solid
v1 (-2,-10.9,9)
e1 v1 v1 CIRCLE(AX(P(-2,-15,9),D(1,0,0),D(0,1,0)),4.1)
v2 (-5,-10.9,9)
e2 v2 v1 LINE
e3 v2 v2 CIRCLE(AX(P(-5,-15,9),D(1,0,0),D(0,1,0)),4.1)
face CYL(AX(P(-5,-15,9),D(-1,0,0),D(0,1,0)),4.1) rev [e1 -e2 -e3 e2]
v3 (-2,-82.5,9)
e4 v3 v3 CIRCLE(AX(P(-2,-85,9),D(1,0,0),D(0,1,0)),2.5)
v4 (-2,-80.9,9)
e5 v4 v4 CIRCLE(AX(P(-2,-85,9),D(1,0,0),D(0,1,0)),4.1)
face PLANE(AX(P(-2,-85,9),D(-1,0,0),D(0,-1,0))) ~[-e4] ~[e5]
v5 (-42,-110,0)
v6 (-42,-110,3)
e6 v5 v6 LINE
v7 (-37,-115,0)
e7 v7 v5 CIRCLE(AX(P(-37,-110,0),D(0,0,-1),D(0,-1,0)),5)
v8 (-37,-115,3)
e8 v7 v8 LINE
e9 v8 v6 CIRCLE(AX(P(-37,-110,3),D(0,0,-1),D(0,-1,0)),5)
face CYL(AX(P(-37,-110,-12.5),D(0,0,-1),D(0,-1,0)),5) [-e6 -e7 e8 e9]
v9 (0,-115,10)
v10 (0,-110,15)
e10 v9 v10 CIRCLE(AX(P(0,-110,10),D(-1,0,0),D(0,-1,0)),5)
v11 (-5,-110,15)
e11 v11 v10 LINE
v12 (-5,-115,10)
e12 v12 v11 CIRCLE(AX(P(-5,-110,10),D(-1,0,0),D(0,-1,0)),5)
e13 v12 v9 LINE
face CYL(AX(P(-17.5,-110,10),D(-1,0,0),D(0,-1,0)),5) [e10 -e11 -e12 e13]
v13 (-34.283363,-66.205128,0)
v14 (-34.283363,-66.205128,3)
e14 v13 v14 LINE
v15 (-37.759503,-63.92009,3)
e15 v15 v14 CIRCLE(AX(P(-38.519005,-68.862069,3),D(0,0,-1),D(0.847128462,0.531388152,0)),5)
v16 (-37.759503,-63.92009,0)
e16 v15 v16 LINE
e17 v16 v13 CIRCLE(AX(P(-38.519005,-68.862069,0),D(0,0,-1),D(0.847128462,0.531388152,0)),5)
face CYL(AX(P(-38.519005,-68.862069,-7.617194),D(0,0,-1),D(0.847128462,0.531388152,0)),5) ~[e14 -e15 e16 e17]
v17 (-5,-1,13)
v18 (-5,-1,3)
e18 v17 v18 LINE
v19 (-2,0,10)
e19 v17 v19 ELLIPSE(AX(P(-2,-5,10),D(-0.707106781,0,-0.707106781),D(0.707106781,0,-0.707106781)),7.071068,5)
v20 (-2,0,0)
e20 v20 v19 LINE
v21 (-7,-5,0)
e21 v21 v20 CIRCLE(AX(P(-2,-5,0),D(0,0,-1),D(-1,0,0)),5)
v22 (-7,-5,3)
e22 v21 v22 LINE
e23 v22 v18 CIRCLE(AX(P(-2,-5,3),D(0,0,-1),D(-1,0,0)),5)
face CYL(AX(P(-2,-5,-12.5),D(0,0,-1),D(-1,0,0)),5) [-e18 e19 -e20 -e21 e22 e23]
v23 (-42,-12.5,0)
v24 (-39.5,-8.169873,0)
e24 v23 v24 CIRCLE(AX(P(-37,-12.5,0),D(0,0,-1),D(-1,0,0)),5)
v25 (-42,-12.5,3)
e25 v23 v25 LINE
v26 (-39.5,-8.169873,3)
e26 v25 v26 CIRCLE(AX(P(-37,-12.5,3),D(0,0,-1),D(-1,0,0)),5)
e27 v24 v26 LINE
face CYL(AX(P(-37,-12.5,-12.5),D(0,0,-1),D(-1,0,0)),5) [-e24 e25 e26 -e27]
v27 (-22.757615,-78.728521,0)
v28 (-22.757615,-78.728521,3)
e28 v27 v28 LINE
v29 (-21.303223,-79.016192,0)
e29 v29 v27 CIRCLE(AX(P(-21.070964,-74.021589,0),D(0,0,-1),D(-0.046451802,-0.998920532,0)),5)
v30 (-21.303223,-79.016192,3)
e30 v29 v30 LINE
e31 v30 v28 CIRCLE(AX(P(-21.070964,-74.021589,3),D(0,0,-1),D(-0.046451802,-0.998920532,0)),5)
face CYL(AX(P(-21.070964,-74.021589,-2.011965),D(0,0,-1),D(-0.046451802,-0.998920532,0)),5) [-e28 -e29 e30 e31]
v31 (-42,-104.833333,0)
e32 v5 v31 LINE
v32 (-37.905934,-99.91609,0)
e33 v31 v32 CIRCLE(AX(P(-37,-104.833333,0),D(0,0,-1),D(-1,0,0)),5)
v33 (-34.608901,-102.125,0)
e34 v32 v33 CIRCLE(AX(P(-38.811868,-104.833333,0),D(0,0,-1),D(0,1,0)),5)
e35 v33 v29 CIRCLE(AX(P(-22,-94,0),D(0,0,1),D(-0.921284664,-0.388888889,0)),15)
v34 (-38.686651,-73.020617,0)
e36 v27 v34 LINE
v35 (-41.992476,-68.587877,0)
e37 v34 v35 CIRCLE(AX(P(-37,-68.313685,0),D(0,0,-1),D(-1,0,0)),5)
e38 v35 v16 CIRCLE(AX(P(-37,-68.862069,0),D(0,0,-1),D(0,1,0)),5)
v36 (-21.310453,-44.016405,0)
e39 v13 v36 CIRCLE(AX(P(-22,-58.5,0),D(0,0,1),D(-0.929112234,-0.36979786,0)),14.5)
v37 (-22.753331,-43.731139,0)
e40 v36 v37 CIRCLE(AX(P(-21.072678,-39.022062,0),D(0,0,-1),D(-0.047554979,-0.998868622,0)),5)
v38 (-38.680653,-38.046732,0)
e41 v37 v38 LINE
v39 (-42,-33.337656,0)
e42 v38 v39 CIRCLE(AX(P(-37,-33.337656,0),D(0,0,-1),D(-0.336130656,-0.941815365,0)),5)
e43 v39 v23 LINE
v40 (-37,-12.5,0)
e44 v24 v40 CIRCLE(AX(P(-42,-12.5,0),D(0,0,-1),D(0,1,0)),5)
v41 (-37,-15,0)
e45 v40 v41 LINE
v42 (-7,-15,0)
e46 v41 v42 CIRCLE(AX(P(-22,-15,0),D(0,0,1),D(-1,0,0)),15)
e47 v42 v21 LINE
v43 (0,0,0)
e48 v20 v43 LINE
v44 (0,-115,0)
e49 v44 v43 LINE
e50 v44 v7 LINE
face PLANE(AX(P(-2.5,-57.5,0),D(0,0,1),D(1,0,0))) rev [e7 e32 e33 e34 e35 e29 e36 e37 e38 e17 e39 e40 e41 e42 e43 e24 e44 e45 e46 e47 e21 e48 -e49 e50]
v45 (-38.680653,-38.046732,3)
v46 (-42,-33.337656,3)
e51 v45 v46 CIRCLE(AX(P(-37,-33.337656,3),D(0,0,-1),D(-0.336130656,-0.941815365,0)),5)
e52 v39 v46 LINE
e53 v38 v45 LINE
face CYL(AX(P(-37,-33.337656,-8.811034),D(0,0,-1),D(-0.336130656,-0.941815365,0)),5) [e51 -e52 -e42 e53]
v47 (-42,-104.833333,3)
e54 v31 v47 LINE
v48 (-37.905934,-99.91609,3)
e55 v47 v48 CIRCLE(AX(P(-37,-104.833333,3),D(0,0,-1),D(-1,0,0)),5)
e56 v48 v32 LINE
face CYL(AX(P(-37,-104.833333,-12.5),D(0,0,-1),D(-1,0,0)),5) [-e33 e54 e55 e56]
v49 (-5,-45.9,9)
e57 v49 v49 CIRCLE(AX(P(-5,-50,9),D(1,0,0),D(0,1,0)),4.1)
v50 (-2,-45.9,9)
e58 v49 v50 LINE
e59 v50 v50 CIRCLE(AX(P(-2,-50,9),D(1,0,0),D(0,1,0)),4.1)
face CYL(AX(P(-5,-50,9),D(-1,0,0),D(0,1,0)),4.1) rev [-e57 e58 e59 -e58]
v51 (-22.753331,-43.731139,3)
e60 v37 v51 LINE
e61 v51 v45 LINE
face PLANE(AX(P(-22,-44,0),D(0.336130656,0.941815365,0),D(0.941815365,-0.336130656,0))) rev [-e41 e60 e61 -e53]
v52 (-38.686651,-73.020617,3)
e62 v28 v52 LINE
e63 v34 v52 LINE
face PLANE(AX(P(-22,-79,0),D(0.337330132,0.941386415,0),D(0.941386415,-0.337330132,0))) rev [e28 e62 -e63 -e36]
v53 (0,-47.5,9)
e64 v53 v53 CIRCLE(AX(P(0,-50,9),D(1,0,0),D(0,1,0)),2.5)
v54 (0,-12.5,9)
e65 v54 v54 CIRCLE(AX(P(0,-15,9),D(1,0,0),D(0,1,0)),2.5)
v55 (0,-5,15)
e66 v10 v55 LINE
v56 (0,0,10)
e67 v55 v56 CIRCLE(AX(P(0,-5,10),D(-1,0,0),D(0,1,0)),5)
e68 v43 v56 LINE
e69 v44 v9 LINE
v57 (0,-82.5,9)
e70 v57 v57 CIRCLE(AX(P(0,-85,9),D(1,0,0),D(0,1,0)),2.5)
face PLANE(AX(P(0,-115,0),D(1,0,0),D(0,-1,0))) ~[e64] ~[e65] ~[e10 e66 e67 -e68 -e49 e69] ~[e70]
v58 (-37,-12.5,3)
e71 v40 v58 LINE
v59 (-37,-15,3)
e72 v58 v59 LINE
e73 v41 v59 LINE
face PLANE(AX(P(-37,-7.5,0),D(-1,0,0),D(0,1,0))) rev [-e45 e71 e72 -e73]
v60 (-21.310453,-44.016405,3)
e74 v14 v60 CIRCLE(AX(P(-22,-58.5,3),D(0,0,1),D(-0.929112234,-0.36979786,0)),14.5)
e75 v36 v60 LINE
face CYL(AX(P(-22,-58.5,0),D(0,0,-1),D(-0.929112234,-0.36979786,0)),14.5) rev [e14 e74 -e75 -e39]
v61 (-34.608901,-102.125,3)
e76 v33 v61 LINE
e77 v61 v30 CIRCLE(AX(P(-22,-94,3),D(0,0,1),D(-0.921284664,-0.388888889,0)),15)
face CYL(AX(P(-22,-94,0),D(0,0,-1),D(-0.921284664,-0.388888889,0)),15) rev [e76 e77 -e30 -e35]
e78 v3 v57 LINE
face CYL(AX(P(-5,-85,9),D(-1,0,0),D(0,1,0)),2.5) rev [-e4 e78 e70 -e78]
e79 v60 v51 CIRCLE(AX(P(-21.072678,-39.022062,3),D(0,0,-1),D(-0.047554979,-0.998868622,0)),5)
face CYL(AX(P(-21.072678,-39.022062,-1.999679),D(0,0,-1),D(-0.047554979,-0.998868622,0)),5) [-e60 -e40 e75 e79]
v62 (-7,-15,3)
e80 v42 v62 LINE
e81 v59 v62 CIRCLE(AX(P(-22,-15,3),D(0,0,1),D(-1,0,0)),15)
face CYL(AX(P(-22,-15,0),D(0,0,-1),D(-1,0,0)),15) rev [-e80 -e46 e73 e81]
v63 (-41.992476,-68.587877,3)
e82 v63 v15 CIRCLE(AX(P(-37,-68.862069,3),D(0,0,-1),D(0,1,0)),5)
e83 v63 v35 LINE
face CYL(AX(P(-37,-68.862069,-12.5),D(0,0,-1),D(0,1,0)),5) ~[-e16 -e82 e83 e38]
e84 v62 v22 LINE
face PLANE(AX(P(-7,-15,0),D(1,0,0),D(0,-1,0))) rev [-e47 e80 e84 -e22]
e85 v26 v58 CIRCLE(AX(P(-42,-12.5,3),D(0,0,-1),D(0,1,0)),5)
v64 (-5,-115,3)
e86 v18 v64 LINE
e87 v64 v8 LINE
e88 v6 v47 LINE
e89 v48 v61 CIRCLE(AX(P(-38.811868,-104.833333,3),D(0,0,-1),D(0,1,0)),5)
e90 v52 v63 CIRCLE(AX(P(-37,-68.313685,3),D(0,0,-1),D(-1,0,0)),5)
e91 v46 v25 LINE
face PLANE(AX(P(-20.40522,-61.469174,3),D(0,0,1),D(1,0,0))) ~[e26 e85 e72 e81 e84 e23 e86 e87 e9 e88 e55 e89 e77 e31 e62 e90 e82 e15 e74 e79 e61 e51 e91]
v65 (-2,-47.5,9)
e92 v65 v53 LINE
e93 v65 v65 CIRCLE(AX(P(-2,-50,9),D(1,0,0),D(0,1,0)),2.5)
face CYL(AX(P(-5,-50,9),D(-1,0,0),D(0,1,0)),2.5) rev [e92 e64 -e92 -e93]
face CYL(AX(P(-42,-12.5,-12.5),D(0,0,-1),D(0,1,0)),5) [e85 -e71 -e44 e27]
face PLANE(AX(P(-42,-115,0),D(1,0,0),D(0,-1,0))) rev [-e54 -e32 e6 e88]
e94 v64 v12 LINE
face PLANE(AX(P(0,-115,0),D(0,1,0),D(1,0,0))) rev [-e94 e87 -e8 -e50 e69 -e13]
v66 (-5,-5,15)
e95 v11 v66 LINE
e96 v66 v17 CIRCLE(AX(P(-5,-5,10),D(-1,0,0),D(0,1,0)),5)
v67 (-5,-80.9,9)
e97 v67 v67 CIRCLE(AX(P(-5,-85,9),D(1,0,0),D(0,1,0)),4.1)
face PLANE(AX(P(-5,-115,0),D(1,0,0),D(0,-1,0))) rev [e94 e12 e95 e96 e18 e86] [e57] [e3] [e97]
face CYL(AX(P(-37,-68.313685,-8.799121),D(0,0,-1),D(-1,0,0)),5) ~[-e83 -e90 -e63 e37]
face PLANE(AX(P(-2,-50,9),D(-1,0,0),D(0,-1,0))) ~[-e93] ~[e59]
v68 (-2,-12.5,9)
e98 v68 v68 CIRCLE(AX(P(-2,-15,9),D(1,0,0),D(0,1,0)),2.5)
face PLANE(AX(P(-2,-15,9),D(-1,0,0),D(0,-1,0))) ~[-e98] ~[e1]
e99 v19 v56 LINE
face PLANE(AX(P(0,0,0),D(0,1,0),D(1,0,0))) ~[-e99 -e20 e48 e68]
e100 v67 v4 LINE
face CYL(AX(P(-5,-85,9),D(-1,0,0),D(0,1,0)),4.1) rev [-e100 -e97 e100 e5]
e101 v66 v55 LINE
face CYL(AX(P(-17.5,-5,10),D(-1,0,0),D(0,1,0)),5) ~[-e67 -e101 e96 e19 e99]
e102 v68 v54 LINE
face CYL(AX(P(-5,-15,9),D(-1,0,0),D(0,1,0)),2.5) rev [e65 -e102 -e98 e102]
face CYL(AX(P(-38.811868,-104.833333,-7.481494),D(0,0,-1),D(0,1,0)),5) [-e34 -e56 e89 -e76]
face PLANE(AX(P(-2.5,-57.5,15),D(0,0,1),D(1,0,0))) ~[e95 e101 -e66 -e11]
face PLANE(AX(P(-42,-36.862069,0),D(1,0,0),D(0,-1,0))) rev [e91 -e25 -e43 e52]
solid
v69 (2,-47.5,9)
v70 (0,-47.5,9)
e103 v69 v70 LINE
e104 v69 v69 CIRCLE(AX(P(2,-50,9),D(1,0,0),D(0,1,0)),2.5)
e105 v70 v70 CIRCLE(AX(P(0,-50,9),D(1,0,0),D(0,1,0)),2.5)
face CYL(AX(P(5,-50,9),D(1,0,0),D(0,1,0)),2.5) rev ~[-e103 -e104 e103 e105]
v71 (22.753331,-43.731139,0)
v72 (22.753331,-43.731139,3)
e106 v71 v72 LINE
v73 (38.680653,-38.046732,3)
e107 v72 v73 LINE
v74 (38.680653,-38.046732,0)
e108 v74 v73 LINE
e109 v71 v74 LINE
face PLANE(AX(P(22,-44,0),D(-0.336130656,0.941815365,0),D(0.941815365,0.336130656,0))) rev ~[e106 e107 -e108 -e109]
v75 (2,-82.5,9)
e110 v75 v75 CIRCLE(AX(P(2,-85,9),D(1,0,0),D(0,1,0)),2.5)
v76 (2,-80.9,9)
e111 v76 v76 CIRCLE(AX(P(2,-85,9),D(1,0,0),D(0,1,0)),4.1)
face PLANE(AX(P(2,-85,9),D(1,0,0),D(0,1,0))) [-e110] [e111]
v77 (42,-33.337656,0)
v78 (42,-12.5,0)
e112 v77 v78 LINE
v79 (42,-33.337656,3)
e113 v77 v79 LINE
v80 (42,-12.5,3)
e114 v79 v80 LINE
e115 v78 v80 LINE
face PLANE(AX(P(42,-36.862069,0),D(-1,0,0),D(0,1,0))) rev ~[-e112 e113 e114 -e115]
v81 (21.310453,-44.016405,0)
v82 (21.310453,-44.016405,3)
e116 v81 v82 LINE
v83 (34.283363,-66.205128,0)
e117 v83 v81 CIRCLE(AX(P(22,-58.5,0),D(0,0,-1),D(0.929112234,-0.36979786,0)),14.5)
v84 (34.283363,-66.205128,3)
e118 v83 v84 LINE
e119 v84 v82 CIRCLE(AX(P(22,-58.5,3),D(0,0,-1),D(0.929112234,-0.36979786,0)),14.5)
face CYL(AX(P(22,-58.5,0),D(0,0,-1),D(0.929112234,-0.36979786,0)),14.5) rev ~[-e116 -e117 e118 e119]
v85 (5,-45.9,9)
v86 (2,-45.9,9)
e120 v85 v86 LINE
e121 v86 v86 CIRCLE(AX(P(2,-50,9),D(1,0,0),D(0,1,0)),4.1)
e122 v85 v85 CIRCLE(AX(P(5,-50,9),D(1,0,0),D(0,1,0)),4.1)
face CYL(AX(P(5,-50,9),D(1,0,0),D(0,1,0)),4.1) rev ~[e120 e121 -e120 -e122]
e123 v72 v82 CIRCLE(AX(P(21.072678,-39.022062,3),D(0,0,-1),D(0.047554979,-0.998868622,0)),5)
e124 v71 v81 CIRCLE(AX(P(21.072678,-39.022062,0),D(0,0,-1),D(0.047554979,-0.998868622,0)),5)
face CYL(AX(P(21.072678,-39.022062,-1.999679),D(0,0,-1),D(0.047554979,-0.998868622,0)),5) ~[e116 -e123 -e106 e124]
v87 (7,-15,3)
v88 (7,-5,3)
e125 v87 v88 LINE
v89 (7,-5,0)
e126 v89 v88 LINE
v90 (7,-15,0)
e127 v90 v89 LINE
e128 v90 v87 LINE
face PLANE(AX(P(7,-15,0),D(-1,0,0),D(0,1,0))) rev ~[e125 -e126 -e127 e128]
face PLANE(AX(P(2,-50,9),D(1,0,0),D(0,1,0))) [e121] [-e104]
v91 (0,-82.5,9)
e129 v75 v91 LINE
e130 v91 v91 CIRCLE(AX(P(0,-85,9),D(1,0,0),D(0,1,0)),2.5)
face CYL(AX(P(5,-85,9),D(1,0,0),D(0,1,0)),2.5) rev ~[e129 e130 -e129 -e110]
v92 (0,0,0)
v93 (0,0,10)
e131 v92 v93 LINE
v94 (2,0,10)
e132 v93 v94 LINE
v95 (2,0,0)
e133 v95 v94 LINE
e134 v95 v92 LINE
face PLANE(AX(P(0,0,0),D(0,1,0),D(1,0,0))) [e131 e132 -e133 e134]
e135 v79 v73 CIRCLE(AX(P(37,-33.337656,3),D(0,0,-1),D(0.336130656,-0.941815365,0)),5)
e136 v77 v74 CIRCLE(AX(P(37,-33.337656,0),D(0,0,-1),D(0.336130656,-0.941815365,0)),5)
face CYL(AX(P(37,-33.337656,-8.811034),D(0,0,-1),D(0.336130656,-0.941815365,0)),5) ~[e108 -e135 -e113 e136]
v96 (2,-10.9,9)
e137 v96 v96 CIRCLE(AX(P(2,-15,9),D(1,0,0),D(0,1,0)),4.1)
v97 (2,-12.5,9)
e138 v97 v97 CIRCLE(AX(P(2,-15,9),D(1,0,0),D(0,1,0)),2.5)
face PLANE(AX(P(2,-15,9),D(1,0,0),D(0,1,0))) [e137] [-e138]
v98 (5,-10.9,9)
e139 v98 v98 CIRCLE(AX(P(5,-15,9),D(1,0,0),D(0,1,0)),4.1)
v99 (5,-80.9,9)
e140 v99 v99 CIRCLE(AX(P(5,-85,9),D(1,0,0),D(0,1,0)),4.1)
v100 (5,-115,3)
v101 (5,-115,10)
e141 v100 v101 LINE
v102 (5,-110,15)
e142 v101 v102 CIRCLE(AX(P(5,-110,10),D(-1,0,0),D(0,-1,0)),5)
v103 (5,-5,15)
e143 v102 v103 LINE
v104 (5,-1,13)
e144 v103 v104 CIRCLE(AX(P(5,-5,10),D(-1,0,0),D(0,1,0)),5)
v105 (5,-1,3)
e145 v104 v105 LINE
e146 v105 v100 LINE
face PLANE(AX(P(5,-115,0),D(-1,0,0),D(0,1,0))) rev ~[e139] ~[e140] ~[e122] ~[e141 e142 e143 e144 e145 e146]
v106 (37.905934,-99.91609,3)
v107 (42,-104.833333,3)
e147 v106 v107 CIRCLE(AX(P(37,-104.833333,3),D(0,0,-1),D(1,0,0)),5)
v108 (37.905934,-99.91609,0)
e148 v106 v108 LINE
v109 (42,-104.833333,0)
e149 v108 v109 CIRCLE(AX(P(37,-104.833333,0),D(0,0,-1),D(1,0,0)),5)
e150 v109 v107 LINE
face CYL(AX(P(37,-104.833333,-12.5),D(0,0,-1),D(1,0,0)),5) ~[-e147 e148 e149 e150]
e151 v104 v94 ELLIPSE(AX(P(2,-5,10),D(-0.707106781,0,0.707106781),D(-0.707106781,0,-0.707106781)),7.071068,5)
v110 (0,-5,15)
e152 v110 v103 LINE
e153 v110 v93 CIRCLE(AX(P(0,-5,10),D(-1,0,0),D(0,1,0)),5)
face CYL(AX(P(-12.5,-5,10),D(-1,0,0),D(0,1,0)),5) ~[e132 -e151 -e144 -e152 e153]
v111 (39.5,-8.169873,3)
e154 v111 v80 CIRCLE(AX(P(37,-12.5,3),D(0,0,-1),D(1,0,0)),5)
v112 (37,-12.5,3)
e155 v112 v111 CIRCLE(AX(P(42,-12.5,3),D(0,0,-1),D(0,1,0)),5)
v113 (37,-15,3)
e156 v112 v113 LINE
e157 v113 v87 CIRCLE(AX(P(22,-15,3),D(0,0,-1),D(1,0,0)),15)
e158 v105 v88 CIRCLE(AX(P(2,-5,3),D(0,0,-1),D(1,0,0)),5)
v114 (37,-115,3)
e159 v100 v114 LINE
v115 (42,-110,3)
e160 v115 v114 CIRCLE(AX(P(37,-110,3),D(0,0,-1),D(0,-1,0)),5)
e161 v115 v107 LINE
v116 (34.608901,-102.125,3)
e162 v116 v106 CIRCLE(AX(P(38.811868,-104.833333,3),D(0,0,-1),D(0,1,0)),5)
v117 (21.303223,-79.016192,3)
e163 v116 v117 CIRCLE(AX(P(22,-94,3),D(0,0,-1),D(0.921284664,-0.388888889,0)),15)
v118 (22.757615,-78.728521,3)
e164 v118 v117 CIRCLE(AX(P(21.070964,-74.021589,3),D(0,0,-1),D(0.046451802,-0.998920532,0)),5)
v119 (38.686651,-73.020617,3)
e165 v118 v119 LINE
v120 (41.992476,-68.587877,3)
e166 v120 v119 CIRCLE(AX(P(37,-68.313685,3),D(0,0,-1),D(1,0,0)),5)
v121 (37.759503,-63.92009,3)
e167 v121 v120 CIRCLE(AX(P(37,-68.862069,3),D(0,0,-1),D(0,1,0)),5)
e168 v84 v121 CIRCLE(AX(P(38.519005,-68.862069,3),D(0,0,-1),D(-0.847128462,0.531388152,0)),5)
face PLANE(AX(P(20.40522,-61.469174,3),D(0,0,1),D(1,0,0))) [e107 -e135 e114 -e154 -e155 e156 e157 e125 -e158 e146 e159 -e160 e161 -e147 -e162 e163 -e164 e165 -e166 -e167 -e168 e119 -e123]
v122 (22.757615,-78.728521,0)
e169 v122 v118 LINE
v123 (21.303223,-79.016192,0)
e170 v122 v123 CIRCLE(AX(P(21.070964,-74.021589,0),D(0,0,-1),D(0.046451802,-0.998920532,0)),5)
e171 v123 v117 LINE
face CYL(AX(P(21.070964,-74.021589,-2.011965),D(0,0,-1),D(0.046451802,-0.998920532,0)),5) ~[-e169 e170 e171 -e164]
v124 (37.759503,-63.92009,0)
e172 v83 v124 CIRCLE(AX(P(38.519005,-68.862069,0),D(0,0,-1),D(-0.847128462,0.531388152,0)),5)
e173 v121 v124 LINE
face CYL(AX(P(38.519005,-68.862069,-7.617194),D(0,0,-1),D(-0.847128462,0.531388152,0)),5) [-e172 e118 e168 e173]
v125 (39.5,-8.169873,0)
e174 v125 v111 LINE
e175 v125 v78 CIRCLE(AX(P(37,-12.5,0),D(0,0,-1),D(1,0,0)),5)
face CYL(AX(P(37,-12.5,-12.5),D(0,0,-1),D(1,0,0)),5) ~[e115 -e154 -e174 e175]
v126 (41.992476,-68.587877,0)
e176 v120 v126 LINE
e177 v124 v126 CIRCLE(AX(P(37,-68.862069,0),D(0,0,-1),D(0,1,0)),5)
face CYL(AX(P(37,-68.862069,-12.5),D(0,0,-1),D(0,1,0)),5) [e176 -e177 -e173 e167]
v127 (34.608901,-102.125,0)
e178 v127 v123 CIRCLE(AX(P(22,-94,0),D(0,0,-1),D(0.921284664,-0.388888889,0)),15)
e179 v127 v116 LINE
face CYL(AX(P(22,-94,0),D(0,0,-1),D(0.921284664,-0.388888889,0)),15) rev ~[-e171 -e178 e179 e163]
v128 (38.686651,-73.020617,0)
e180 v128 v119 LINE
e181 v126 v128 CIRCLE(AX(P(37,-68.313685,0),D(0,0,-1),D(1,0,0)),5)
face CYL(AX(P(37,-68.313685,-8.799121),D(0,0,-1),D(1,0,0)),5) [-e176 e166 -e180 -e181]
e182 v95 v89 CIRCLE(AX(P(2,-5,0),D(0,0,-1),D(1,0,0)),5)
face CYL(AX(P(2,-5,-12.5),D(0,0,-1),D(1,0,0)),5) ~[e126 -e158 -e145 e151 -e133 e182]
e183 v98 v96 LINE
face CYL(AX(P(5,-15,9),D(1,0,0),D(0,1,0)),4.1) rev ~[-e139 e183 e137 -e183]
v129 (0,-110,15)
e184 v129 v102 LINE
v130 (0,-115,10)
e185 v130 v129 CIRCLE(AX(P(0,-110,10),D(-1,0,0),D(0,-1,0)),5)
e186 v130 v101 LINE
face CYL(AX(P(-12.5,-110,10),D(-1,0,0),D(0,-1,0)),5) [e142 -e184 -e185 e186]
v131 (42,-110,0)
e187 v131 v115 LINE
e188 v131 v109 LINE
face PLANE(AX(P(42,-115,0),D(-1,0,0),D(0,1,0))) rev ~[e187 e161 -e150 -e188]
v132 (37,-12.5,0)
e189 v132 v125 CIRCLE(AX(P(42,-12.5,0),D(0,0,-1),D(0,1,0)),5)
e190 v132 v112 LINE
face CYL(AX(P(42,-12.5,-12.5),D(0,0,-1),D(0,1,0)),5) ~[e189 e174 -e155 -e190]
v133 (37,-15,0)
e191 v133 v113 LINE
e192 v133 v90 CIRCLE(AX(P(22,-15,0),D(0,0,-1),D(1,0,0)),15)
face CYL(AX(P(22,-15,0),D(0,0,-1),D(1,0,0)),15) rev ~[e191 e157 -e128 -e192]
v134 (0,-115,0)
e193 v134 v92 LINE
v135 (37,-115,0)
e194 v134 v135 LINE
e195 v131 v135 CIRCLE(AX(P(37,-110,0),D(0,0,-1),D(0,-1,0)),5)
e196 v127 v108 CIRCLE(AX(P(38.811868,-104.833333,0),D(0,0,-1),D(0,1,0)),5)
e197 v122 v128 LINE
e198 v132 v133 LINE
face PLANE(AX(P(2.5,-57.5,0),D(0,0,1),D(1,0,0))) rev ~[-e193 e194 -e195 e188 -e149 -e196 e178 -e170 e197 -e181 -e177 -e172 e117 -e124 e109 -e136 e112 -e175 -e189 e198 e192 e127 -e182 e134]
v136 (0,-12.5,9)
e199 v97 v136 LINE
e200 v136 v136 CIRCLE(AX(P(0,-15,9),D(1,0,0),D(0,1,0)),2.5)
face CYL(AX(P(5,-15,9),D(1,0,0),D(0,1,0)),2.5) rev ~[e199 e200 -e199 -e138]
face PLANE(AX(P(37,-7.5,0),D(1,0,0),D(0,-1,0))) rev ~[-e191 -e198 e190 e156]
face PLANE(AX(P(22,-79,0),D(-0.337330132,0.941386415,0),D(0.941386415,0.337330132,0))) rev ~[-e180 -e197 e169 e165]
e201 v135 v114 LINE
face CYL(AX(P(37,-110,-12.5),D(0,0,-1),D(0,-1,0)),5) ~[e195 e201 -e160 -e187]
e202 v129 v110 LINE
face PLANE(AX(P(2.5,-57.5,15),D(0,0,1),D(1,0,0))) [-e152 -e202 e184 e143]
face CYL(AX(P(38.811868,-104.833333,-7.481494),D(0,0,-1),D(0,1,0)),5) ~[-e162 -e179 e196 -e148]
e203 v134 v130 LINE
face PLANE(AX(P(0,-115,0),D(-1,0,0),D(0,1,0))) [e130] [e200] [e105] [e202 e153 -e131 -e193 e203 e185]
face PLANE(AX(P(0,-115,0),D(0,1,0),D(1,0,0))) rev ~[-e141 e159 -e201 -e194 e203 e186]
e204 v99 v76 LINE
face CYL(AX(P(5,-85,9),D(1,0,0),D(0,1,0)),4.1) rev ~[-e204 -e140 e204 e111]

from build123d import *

# Parameters (mm, degrees)
F1_DEPTH     = 3
F0_W         = 5
F0_H         = 115
F2_DEPTH     = 15
F3_R         = 4.1
F3_R_2       = 2.5
F4_DEPTH     = 3
F5_DEPTH     = 25
F7_T1_DEPTH  = 28
F7_T3_DEPTH  = 20.6220671379
F7_T5_DEPTH  = 20.5982428035
F7_T7_DEPTH  = 18.234388136
F7_T9_DEPTH  = 17.9629877086
F7_T11_DEPTH = 7.0239301021
F7_T13_DEPTH = 6.9993570631
F7_T15_DEPTH = 30
F8_T1_DEPTH  = 30
F8_T3_DEPTH  = 28
F8_T5_DEPTH  = 20.5982428035
F8_T7_DEPTH  = 20.6220671379
F8_T9_DEPTH  = 6.9993570631
F8_T11_DEPTH = 7.0239301021
F8_T13_DEPTH = 17.9629877086
F8_T15_DEPTH = 18.234388136


# Not quite as in the source:
# - a fillet or chamfer that OpenCascade refuses, or shapes differently, is made with other operations: its cross-section is extruded or revolved along the edge and cut away or added


with BuildPart() as f1:
    # F0 (on Top) → F1 (new body)
    with BuildSketch(Plane.XY):
        with BuildLine():
            Line((7, 0), (5, 0))
            Line((5, 0), (5, -115))
            Line((5, -115), (42, -115))
            Line((42, -115), (42, -99.8333333333))
            Line((42, -99.8333333333), (35.8192699598, -99.8333333333))
            ThreePointArc((35.8192699598, -99.8333333333), (9.5, -102.2915619759), (22, -79))
            Line((22, -79), (42, -71.8333333333))
            Line((42, -71.8333333333), (42, -63.8620689655))
            Line((42, -63.8620689655), (35.4721273899, -63.8620689655))
            ThreePointArc((35.4721273899, -63.8620689655), (10, -66.639410298), (22, -44))
            Line((22, -44), (42, -36.8620689655))
            Line((42, -36.8620689655), (42, -7.5))
            Line((42, -7.5), (37, -7.5))
            Line((37, -7.5), (37, -15))
            ThreePointArc((37, -15), (22, -30), (7, -15))
            Line((7, -15), (7, 0))
        make_face()
    extrude(amount=F1_DEPTH)

    # F0 (on Top) → F2 (join)
    with BuildSketch(Plane.XY):
        with Locations((2.5, -57.5)):
            Rectangle(F0_W, F0_H)
    extrude(amount=F2_DEPTH)

    # F3 (on face) → F4 (cut)
    with BuildSketch(Plane.YZ.offset(5)):
        with Locations((-85, 9)):
            Circle(F3_R)
        with Locations((-85, 9)):
            Circle(F3_R_2, mode=Mode.SUBTRACT)
        with Locations((-50, 9)):
            Circle(F3_R)
        with Locations((-50, 9)):
            Circle(F3_R_2, mode=Mode.SUBTRACT)
        with Locations((-15, 9)):
            Circle(F3_R)
        with Locations((-15, 9)):
            Circle(F3_R_2, mode=Mode.SUBTRACT)
    extrude(amount=-F4_DEPTH, mode=Mode.SUBTRACT)

    # F5 (cut): faces of the model
    f5_faces = [f1.faces().sort_by_distance(p)[0] for p in [
        (5, -15, 9),
        (5, -50, 9),
        (5, -85, 9),
    ]]
    extrude(f5_faces, amount=-F5_DEPTH, mode=Mode.SUBTRACT)


with BuildPart() as f6_1:
    # F6: instance of F1
    add(f1.part.mirror(Plane(origin=(0, -57.7651628091, 7.4469674382), x_dir=(0, -1, 0), z_dir=(-1, 0, 0))))

    # F7: fillet of radius 5 on 14 edges, made by hand

    # F7_s2 → F7_t1 (cut)
    with BuildSketch(Plane.XY.offset(-12.5)):
        with BuildLine():
            ThreePointArc((-37, -115), (-40.5355339059, -113.5355339059), (-42, -110))
            Line((-42, -110), (-42, -115))
            Line((-42, -115), (-37, -115))
        make_face()
        with BuildLine():
            ThreePointArc((-42, -12.5), (-40.5355339059, -8.9644660941), (-37, -7.5))
            Line((-37, -7.5), (-42, -7.5))
            Line((-42, -7.5), (-42, -12.5))
        make_face()
        with BuildLine():
            ThreePointArc((-42, -7.5), (-38.4644660941, -8.9644660941), (-37, -12.5))
            Line((-37, -12.5), (-37, -7.5))
            Line((-37, -7.5), (-42, -7.5))
        make_face()
        with BuildLine():
            ThreePointArc((-42, -104.8333333333), (-40.5355339059, -101.2977994274), (-37, -99.8333333333))
            Line((-37, -99.8333333333), (-42, -99.8333333333))
            Line((-42, -99.8333333333), (-42, -104.8333333333))
        make_face()
        with BuildLine():
            ThreePointArc((-37, -63.8620689655), (-40.5355339059, -65.3265350596), (-42, -68.8620689655))
            Line((-42, -68.8620689655), (-42, -63.8620689655))
            Line((-42, -63.8620689655), (-37, -63.8620689655))
        make_face()
        with BuildLine():
            ThreePointArc((-7, -5), (-5.5355339059, -1.4644660941), (-2, 0))
            Line((-2, 0), (-7, 0))
            Line((-7, 0), (-7, -5))
        make_face()
    extrude(amount=F7_T1_DEPTH, mode=Mode.SUBTRACT)

    # F7_s4 → F7_t3 (cut)
    with BuildSketch(Plane.XY.offset(-8.8110335689)):
        with BuildLine():
            ThreePointArc((-38.6806532809, -38.0467323636), (-41.0867631693, -36.2183441358), (-42, -33.3376555379))
            Line((-42, -33.3376555379), (-42, -36.8620689655))
            Line((-42, -36.8620689655), (-38.6806532809, -38.0467323636))
        make_face()
    extrude(amount=F7_T3_DEPTH, mode=Mode.SUBTRACT)

    # F7_s6 → F7_t5 (cut)
    with BuildSketch(Plane.XY.offset(-8.7991214017)):
        with BuildLine():
            ThreePointArc((-42, -68.3136847726), (-41.0885971494, -71.191769787), (-38.6866506599, -73.0206168469))
            Line((-38.6866506599, -73.0206168469), (-42, -71.8333333333))
            Line((-42, -71.8333333333), (-42, -68.3136847726))
        make_face()
    extrude(amount=F7_T5_DEPTH, mode=Mode.SUBTRACT)

    # F7_s8 → F7_t7 (cut)
    with BuildSketch(Plane.XY.offset(-7.617194068)):
        with BuildLine():
            ThreePointArc((-34.283362705, -66.2051282051), (-36.0987471591, -64.4868716099), (-38.5190050171, -63.8620689655))
            Line((-38.5190050171, -63.8620689655), (-35.4721273899, -63.8620689655))
            ThreePointArc((-35.4721273899, -63.8620689655), (-34.9309241416, -65.060579307), (-34.283362705, -66.2051282051))
        make_face()
    extrude(amount=F7_T7_DEPTH, mode=Mode.SUBTRACT)

    # F7_s10 → F7_t9 (cut)
    with BuildSketch(Plane.XY.offset(-7.4814938543)):
        with BuildLine():
            ThreePointArc((-38.8118675015, -99.8333333333), (-36.4182997321, -100.443477603), (-34.6089006261, -102.125))
            ThreePointArc((-34.6089006261, -102.125), (-35.2636715942, -101.0053562252), (-35.8192699598, -99.8333333333))
            Line((-35.8192699598, -99.8333333333), (-38.8118675015, -99.8333333333))
        make_face()
    extrude(amount=F7_T9_DEPTH, mode=Mode.SUBTRACT)

    # F7_s12 → F7_t11 (cut)
    with BuildSketch(Plane.XY.offset(-2.011965051)):
        with BuildLine():
            ThreePointArc((-21.3032229749, -79.0161920135), (-22.0411403271, -78.9265621167), (-22.7576146265, -78.7285214255))
            Line((-22.7576146265, -78.7285214255), (-22, -79))
            ThreePointArc((-22, -79), (-21.6515174309, -79.0040485497), (-21.3032229749, -79.0161920135))
        make_face()
    extrude(amount=F7_T11_DEPTH, mode=Mode.SUBTRACT)

    # F7_s14 → F7_t13 (cut)
    with BuildSketch(Plane.XY.offset(-1.9996785315)):
        with BuildLine():
            ThreePointArc((-21.3104528016, -44.0164049815), (-22.0424386394, -43.9271168274), (-22.7533311865, -43.7311386972))
            Line((-22.7533311865, -43.7311386972), (-22, -44))
            ThreePointArc((-22, -44), (-21.6551288421, -44.0041018255), (-21.3104528016, -44.0164049815))
        make_face()
    extrude(amount=F7_T13_DEPTH, mode=Mode.SUBTRACT)

    # F7_s16 → F7_t15 (cut)
    with BuildSketch(Plane.YZ.offset(-17.5)):
        with BuildLine():
            ThreePointArc((0, 10), (-1.4644660941, 13.5355339059), (-5, 15))
            Line((-5, 15), (0, 15))
            Line((0, 15), (0, 10))
        make_face()
        with BuildLine():
            ThreePointArc((-115, 10), (-113.5355339059, 13.5355339059), (-110, 15))
            Line((-110, 15), (-115, 15))
            Line((-115, 15), (-115, 10))
        make_face()
    extrude(amount=F7_T15_DEPTH, mode=Mode.SUBTRACT)


with BuildPart() as f1_1:
    add(f1.part)

    # F8: fillet of radius 5 on 14 edges, made by hand

    # F8_s2 → F8_t1 (cut)
    with BuildSketch(Plane.YZ.offset(-12.5)):
        with BuildLine():
            ThreePointArc((-115, 10), (-113.5355339059, 13.5355339059), (-110, 15))
            Line((-110, 15), (-115, 15))
            Line((-115, 15), (-115, 10))
        make_face()
        with BuildLine():
            ThreePointArc((0, 10), (-1.4644660941, 13.5355339059), (-5, 15))
            Line((-5, 15), (0, 15))
            Line((0, 15), (0, 10))
        make_face()
    extrude(amount=F8_T1_DEPTH, mode=Mode.SUBTRACT)

    # F8_s4 → F8_t3 (cut)
    with BuildSketch(Plane.XY.offset(-12.5)):
        with BuildLine():
            ThreePointArc((37, -115), (40.5355339059, -113.5355339059), (42, -110))
            Line((42, -110), (42, -115))
            Line((42, -115), (37, -115))
        make_face()
        with BuildLine():
            ThreePointArc((42, -104.8333333333), (40.5355339059, -101.2977994274), (37, -99.8333333333))
            Line((37, -99.8333333333), (42, -99.8333333333))
            Line((42, -99.8333333333), (42, -104.8333333333))
        make_face()
        with BuildLine():
            ThreePointArc((37, -63.8620689655), (40.5355339059, -65.3265350596), (42, -68.8620689655))
            Line((42, -68.8620689655), (42, -63.8620689655))
            Line((42, -63.8620689655), (37, -63.8620689655))
        make_face()
        with BuildLine():
            ThreePointArc((42, -7.5), (38.4644660941, -8.9644660941), (37, -12.5))
            Line((37, -12.5), (37, -7.5))
            Line((37, -7.5), (42, -7.5))
        make_face()
        with BuildLine():
            ThreePointArc((42, -12.5), (40.5355339059, -8.9644660941), (37, -7.5))
            Line((37, -7.5), (42, -7.5))
            Line((42, -7.5), (42, -12.5))
        make_face()
        with BuildLine():
            ThreePointArc((7, -5), (5.5355339059, -1.4644660941), (2, 0))
            Line((2, 0), (7, 0))
            Line((7, 0), (7, -5))
        make_face()
    extrude(amount=F8_T3_DEPTH, mode=Mode.SUBTRACT)

    # F8_s6 → F8_t5 (cut)
    with BuildSketch(Plane.XY.offset(-8.7991214017)):
        with BuildLine():
            ThreePointArc((42, -68.3136847726), (41.0885971494, -71.191769787), (38.6866506599, -73.0206168469))
            Line((38.6866506599, -73.0206168469), (42, -71.8333333333))
            Line((42, -71.8333333333), (42, -68.3136847726))
        make_face()
    extrude(amount=F8_T5_DEPTH, mode=Mode.SUBTRACT)

    # F8_s8 → F8_t7 (cut)
    with BuildSketch(Plane.XY.offset(-8.8110335689)):
        with BuildLine():
            ThreePointArc((38.6806532809, -38.0467323636), (41.0867631693, -36.2183441358), (42, -33.3376555379))
            Line((42, -33.3376555379), (42, -36.8620689655))
            Line((42, -36.8620689655), (38.6806532809, -38.0467323636))
        make_face()
    extrude(amount=F8_T7_DEPTH, mode=Mode.SUBTRACT)

    # F8_s10 → F8_t9 (cut)
    with BuildSketch(Plane.XY.offset(-1.9996785315)):
        with BuildLine():
            ThreePointArc((21.3104528016, -44.0164049815), (22.0424386394, -43.9271168274), (22.7533311865, -43.7311386972))
            Line((22.7533311865, -43.7311386972), (22, -44))
            ThreePointArc((22, -44), (21.6551288421, -44.0041018255), (21.3104528016, -44.0164049815))
        make_face()
    extrude(amount=F8_T9_DEPTH, mode=Mode.SUBTRACT)

    # F8_s12 → F8_t11 (cut)
    with BuildSketch(Plane.XY.offset(-2.011965051)):
        with BuildLine():
            ThreePointArc((21.3032229749, -79.0161920135), (22.0411403271, -78.9265621167), (22.7576146265, -78.7285214255))
            Line((22.7576146265, -78.7285214255), (22, -79))
            ThreePointArc((22, -79), (21.6515174309, -79.0040485497), (21.3032229749, -79.0161920135))
        make_face()
    extrude(amount=F8_T11_DEPTH, mode=Mode.SUBTRACT)

    # F8_s14 → F8_t13 (cut)
    with BuildSketch(Plane.XY.offset(-7.4814938543)):
        with BuildLine():
            ThreePointArc((38.8118675015, -99.8333333333), (36.4182997321, -100.443477603), (34.6089006261, -102.125))
            ThreePointArc((34.6089006261, -102.125), (35.2636715942, -101.0053562252), (35.8192699598, -99.8333333333))
            Line((35.8192699598, -99.8333333333), (38.8118675015, -99.8333333333))
        make_face()
    extrude(amount=F8_T13_DEPTH, mode=Mode.SUBTRACT)

    # F8_s16 → F8_t15 (cut)
    with BuildSketch(Plane.XY.offset(-7.617194068)):
        with BuildLine():
            ThreePointArc((34.283362705, -66.2051282051), (36.0987471591, -64.4868716099), (38.5190050171, -63.8620689655))
            Line((38.5190050171, -63.8620689655), (35.4721273899, -63.8620689655))
            ThreePointArc((35.4721273899, -63.8620689655), (34.9309241416, -65.060579307), (34.283362705, -66.2051282051))
        make_face()
    extrude(amount=F8_T15_DEPTH, mode=Mode.SUBTRACT)


solid = Compound([f6_1.part, f1_1.part])
